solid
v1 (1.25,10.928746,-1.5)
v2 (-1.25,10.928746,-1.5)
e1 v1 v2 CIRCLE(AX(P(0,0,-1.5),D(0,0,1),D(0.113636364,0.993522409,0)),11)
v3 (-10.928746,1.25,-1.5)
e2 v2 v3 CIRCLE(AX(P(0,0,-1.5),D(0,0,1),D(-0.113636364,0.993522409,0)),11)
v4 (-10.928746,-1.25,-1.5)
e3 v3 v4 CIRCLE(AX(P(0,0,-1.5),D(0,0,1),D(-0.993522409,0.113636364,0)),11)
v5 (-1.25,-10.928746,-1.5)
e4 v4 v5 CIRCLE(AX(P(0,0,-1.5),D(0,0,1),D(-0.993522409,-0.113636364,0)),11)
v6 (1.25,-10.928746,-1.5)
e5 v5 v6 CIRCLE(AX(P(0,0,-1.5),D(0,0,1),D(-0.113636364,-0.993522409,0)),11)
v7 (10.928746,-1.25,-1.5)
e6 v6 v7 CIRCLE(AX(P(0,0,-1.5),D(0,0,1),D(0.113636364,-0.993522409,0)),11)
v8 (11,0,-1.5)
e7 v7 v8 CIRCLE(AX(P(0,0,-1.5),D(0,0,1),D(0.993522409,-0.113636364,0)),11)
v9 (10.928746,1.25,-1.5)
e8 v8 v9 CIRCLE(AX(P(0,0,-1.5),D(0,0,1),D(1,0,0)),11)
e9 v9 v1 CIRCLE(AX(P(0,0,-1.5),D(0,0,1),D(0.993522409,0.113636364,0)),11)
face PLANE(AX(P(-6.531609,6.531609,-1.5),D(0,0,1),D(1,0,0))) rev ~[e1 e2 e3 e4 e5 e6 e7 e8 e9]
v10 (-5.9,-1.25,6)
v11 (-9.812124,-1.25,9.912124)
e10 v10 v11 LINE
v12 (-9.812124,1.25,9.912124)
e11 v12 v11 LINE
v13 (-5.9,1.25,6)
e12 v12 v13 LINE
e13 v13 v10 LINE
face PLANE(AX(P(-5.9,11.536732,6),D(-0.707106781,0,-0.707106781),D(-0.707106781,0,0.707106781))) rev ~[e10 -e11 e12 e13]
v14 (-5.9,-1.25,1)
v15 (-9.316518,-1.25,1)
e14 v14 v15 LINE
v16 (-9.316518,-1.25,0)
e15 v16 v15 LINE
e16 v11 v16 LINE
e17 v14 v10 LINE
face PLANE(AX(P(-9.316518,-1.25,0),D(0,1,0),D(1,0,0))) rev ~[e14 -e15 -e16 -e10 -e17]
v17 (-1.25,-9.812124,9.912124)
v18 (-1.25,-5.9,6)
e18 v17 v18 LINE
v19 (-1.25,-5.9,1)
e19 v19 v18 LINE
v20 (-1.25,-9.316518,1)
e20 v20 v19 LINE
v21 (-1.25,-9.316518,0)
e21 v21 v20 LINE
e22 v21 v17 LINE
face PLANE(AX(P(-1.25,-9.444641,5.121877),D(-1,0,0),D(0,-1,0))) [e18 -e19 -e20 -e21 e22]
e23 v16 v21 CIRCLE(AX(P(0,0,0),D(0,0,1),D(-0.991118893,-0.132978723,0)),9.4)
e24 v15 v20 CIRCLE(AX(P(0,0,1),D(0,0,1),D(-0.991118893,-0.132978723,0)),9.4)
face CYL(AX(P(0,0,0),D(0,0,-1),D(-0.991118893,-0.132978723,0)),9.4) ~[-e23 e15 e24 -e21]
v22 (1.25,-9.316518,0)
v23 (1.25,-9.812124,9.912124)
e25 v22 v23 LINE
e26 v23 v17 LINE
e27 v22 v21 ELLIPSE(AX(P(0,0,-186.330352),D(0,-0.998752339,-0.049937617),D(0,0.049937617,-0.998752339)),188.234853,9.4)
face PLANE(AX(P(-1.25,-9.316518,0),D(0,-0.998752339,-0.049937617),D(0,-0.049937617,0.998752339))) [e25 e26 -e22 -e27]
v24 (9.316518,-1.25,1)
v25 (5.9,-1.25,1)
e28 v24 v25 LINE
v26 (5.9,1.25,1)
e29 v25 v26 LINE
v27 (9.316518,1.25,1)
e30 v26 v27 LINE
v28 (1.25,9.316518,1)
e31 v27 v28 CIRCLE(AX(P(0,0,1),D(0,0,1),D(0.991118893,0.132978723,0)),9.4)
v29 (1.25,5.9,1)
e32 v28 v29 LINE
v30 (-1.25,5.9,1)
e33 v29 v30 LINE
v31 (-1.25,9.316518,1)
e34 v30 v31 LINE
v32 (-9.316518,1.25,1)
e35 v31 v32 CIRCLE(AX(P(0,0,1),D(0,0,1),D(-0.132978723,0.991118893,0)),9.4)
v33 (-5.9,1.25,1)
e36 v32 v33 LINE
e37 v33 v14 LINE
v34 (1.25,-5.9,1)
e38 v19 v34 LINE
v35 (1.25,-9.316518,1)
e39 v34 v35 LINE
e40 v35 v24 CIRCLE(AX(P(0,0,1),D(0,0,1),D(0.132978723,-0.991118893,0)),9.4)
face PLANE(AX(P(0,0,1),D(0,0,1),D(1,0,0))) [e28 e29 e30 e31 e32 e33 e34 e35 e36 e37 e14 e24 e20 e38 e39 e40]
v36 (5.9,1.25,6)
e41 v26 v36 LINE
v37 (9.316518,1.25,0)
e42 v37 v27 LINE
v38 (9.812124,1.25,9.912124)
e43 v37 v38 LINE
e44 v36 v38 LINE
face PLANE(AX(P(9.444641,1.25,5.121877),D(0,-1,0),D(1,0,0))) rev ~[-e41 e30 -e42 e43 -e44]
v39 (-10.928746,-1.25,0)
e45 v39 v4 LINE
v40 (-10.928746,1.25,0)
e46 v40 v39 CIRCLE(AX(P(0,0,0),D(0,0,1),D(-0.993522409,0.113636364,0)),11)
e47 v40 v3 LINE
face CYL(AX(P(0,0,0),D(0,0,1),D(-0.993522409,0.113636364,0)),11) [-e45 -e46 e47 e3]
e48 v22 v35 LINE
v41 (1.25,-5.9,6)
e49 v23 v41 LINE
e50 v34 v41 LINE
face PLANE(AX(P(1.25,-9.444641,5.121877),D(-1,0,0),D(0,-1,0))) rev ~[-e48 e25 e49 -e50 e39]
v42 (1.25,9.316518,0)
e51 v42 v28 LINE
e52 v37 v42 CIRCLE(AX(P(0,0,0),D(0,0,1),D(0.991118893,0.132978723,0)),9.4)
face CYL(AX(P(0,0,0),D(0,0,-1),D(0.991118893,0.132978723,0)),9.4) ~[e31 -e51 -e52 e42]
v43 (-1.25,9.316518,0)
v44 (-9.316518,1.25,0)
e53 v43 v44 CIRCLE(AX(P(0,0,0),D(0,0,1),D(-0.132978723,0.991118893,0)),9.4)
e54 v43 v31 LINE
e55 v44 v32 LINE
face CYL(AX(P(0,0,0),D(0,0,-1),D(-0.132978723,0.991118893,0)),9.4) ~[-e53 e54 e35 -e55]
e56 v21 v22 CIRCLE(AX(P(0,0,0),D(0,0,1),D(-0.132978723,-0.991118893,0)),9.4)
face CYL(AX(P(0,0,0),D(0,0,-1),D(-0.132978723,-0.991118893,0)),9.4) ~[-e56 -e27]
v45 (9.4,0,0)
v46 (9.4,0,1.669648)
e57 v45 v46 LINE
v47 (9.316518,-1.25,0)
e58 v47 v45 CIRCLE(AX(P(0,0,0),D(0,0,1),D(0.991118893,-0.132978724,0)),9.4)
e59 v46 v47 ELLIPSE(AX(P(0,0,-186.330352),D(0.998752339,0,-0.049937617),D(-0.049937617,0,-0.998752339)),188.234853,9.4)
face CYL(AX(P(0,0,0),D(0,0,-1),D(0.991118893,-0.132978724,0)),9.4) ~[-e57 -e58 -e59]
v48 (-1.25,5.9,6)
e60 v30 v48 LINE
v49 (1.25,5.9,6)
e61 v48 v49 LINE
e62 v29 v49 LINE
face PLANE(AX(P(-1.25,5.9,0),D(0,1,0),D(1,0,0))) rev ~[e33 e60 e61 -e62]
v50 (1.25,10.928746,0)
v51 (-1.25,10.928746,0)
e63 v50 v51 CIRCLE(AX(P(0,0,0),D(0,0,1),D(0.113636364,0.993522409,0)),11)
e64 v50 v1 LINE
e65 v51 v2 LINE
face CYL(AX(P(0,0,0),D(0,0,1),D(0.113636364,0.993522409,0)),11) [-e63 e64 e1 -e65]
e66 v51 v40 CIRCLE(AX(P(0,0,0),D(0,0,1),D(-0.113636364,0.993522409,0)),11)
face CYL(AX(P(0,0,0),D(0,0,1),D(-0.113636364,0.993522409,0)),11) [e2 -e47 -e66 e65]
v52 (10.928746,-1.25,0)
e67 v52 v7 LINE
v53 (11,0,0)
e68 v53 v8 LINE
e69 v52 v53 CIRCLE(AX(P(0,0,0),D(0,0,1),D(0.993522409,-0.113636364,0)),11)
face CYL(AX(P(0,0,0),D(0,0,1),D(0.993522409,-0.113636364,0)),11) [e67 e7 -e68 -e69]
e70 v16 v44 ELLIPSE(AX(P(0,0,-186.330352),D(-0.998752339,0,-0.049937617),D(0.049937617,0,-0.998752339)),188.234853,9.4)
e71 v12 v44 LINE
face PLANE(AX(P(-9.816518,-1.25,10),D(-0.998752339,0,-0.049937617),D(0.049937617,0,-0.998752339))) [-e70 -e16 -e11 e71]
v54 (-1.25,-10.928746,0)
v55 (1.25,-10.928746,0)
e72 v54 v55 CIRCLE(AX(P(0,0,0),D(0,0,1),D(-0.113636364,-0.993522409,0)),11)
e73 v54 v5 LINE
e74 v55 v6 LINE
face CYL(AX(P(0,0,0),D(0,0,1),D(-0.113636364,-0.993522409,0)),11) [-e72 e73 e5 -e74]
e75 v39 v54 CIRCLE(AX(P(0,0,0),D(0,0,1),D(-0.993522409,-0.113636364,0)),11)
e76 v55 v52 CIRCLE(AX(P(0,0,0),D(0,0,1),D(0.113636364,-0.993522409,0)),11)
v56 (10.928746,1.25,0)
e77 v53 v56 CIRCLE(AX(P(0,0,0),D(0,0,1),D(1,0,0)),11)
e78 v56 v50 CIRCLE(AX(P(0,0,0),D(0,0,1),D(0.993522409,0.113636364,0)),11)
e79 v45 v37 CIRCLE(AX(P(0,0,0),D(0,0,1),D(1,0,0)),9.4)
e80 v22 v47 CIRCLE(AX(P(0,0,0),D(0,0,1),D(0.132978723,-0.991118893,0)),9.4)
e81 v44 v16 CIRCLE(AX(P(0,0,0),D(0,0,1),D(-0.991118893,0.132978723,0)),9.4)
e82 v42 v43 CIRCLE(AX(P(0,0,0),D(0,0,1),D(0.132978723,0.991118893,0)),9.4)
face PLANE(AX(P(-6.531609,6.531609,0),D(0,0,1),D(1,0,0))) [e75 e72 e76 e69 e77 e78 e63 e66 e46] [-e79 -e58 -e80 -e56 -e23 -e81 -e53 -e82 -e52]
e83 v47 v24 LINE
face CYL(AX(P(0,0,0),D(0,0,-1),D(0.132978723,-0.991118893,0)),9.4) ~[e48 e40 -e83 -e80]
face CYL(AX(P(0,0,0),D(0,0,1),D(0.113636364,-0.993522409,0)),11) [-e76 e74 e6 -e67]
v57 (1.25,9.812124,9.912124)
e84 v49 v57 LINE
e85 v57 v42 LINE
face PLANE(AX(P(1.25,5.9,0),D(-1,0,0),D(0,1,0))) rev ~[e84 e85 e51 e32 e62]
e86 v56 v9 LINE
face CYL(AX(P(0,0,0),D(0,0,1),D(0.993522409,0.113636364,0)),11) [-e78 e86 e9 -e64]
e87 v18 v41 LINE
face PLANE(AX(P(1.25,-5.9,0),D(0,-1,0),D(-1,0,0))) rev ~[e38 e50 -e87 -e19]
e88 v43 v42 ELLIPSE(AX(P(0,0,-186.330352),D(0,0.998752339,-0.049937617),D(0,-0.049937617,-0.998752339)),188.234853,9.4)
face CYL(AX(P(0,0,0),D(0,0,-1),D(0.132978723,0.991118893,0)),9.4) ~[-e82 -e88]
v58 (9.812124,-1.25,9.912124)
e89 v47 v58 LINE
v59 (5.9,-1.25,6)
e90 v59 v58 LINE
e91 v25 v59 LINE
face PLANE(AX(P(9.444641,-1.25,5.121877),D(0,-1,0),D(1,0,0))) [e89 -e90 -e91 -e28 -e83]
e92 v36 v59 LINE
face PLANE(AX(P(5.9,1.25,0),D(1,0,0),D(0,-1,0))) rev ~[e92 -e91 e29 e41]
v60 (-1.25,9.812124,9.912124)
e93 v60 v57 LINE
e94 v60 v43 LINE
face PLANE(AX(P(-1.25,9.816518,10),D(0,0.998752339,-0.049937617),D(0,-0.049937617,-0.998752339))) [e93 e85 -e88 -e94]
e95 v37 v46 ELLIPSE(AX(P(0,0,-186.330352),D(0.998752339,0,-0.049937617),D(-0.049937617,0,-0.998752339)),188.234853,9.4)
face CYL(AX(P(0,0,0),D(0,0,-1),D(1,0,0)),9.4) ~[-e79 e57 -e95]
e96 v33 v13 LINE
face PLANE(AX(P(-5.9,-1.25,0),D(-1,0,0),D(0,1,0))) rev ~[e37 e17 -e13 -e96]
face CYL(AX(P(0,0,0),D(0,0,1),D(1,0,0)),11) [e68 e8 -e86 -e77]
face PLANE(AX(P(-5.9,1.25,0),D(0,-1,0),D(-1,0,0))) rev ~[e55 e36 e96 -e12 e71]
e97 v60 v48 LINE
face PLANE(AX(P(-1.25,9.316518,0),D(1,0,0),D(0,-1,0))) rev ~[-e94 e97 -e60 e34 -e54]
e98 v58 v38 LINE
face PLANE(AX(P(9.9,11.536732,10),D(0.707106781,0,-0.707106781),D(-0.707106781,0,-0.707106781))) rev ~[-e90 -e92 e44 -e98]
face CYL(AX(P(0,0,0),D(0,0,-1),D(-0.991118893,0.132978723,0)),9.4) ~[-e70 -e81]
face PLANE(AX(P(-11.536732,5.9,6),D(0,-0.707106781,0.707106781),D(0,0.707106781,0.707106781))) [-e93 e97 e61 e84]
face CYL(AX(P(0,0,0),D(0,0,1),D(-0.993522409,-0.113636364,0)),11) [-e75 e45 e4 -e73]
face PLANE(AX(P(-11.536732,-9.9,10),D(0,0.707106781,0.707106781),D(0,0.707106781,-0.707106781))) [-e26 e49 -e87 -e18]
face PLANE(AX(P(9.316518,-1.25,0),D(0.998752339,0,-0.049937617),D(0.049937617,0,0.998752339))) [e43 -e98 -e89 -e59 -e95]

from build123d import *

# Parameters (mm, degrees)
F1_DEPTH     = 1.5
F2_DEPTH     = 10
F4_DEPTH     = 2.5
F6_DEPTH     = 2.5
F8_DEPTH     = 2.5
F10_DEPTH    = 2.5
F11_DEPTH    = 1
F12_T1_DEPTH = 23.0734639037
F12_T3_DEPTH = 23.0734639037


# Not quite as in the source:
# - a fillet or chamfer that OpenCascade refuses, or shapes differently, is made with other operations: its cross-section is extruded or revolved along the edge and cut away or added


with BuildPart() as f1:
    # F0 (on Top) → F1 (new body)
    with BuildSketch(Plane.XY):
        with BuildLine():
            Line((-1.25, 9.3165175897), (-1.25, 10.9287464972))
            ThreePointArc((-1.25, 10.9287464972), (-7.7781745931, 7.7781745931), (-10.9287464972, 1.25))
            Line((-10.9287464972, 1.25), (-9.3165175897, 1.25))
            ThreePointArc((-9.3165175897, 1.25), (-6.6468037432, 6.6468037432), (-1.25, 9.3165175897))
        make_face()
        with BuildLine():
            ThreePointArc((-10.9287464972, -1.25), (-7.7781745931, -7.7781745931), (-1.25, -10.9287464972))
            Line((-1.25, -10.9287464972), (-1.25, -9.3165175897))
            ThreePointArc((-1.25, -9.3165175897), (-6.6468037432, -6.6468037432), (-9.3165175897, -1.25))
            Line((-9.3165175897, -1.25), (-10.9287464972, -1.25))
        make_face()
        with BuildLine():
            Line((-9.3165175897, 1.25), (-10.9287464972, 1.25))
            ThreePointArc((-10.9287464972, 1.25), (-11, 0), (-10.9287464972, -1.25))
            Line((-10.9287464972, -1.25), (-9.3165175897, -1.25))
            ThreePointArc((-9.3165175897, -1.25), (-9.4, 0), (-9.3165175897, 1.25))
        make_face()
        with BuildLine():
            ThreePointArc((1.25, -10.9287464972), (7.7781745931, -7.7781745931), (10.9287464972, -1.25))
            Line((10.9287464972, -1.25), (9.3165175897, -1.25))
            ThreePointArc((9.3165175897, -1.25), (6.6468037432, -6.6468037432), (1.25, -9.3165175897))
            Line((1.25, -9.3165175897), (1.25, -10.9287464972))
        make_face()
        with BuildLine():
            ThreePointArc((-1.25, -10.9287464972), (0, -11), (1.25, -10.9287464972))
            Line((1.25, -10.9287464972), (1.25, -9.3165175897))
            ThreePointArc((1.25, -9.3165175897), (0, -9.4), (-1.25, -9.3165175897))
            Line((-1.25, -9.3165175897), (-1.25, -10.9287464972))
        make_face()
        with BuildLine():
            Line((9.3165175897, 1.25), (10.9287464972, 1.25))
            ThreePointArc((10.9287464972, 1.25), (7.7781745931, 7.7781745931), (1.25, 10.9287464972))
            Line((1.25, 10.9287464972), (1.25, 9.3165175897))
            ThreePointArc((1.25, 9.3165175897), (6.6468037432, 6.6468037432), (9.3165175897, 1.25))
        make_face()
        with BuildLine():
            ThreePointArc((10.9287464972, -1.25), (10.9821721774, -0.6260145888), (11, 0))
            ThreePointArc((11, 0), (10.9821721774, 0.6260145888), (10.9287464972, 1.25))
            Line((10.9287464972, 1.25), (9.3165175897, 1.25))
            ThreePointArc((9.3165175897, 1.25), (9.3791061766, 0.6263923117), (9.4, 0))
            ThreePointArc((9.4, 0), (9.3791061766, -0.6263923117), (9.3165175897, -1.25))
            Line((9.3165175897, -1.25), (10.9287464972, -1.25))
        make_face()
        with BuildLine():
            Line((1.25, 9.3165175897), (1.25, 10.9287464972))
            ThreePointArc((1.25, 10.9287464972), (0, 11), (-1.25, 10.9287464972))
            Line((-1.25, 10.9287464972), (-1.25, 9.3165175897))
            ThreePointArc((-1.25, 9.3165175897), (0, 9.4), (1.25, 9.3165175897))
        make_face()
        with BuildLine():
            Line((5.9, 1.25), (9.3165175897, 1.25))
            ThreePointArc((9.3165175897, 1.25), (6.6468037432, 6.6468037432), (1.25, 9.3165175897))
            Line((1.25, 9.3165175897), (1.25, 5.9))
            Line((1.25, 5.9), (-1.25, 5.9))
            Line((-1.25, 5.9), (-1.25, 9.3165175897))
            ThreePointArc((-1.25, 9.3165175897), (-6.6468037432, 6.6468037432), (-9.3165175897, 1.25))
            Line((-9.3165175897, 1.25), (-5.9, 1.25))
            Line((-5.9, 1.25), (-5.9, -1.25))
            Line((-5.9, -1.25), (-9.3165175897, -1.25))
            ThreePointArc((-9.3165175897, -1.25), (-6.6468037432, -6.6468037432), (-1.25, -9.3165175897))
            Line((-1.25, -9.3165175897), (-1.25, -5.9))
            Line((-1.25, -5.9), (1.25, -5.9))
            Line((1.25, -5.9), (1.25, -9.3165175897))
            ThreePointArc((1.25, -9.3165175897), (6.6468037432, -6.6468037432), (9.3165175897, -1.25))
            Line((9.3165175897, -1.25), (5.9, -1.25))
            Line((5.9, -1.25), (5.9, 1.25))
        make_face()
        with BuildLine():
            Line((1.25, 5.9), (1.25, 9.3165175897))
            ThreePointArc((1.25, 9.3165175897), (0, 9.4), (-1.25, 9.3165175897))
            Line((-1.25, 9.3165175897), (-1.25, 5.9))
            Line((-1.25, 5.9), (1.25, 5.9))
        make_face()
        with BuildLine():
            ThreePointArc((9.4, 0), (9.3791061766, 0.6263923117), (9.3165175897, 1.25))
            Line((9.3165175897, 1.25), (5.9, 1.25))
            Line((5.9, 1.25), (5.9, -1.25))
            Line((5.9, -1.25), (9.3165175897, -1.25))
            ThreePointArc((9.3165175897, -1.25), (9.3791061766, -0.6263923117), (9.4, 0))
        make_face()
        with BuildLine():
            Line((-5.9, 1.25), (-9.3165175897, 1.25))
            ThreePointArc((-9.3165175897, 1.25), (-9.4, 0), (-9.3165175897, -1.25))
            Line((-9.3165175897, -1.25), (-5.9, -1.25))
            Line((-5.9, -1.25), (-5.9, 1.25))
        make_face()
        with BuildLine():
            ThreePointArc((-1.25, -9.3165175897), (0, -9.4), (1.25, -9.3165175897))
            Line((1.25, -9.3165175897), (1.25, -5.9))
            Line((1.25, -5.9), (-1.25, -5.9))
            Line((-1.25, -5.9), (-1.25, -9.3165175897))
        make_face()
    extrude(amount=-F1_DEPTH)

    # F0 (on Top) → F2 (join)
    with BuildSketch(Plane.XY):
        with BuildLine():
            Line((1.25, 5.9), (1.25, 9.3165175897))
            ThreePointArc((1.25, 9.3165175897), (0, 9.4), (-1.25, 9.3165175897))
            Line((-1.25, 9.3165175897), (-1.25, 5.9))
            Line((-1.25, 5.9), (1.25, 5.9))
        make_face()
        with BuildLine():
            ThreePointArc((9.4, 0), (9.3791061766, 0.6263923117), (9.3165175897, 1.25))
            Line((9.3165175897, 1.25), (5.9, 1.25))
            Line((5.9, 1.25), (5.9, -1.25))
            Line((5.9, -1.25), (9.3165175897, -1.25))
            ThreePointArc((9.3165175897, -1.25), (9.3791061766, -0.6263923117), (9.4, 0))
        make_face()
        with BuildLine():
            Line((-5.9, 1.25), (-9.3165175897, 1.25))
            ThreePointArc((-9.3165175897, 1.25), (-9.4, 0), (-9.3165175897, -1.25))
            Line((-9.3165175897, -1.25), (-5.9, -1.25))
            Line((-5.9, -1.25), (-5.9, 1.25))
        make_face()
        with BuildLine():
            ThreePointArc((-1.25, -9.3165175897), (0, -9.4), (1.25, -9.3165175897))
            Line((1.25, -9.3165175897), (1.25, -5.9))
            Line((1.25, -5.9), (-1.25, -5.9))
            Line((-1.25, -5.9), (-1.25, -9.3165175897))
        make_face()
    extrude(amount=F2_DEPTH)

    # F3 (on face) → F4 (join)
    with BuildSketch(Plane(origin=(-1.25, 0, 0), x_dir=(0, -1, 0), z_dir=(-1, 0, 0))):
        Polygon((-9.3165175897, 0), (-9.3165175897, 10), (-9.8165175897, 10), align=None)
    extrude(amount=-F4_DEPTH)

    # F5 (on face) → F6 (join)
    with BuildSketch(Plane(origin=(-1.25, 0, 0), x_dir=(0, -1, 0), z_dir=(-1, 0, 0))):
        Polygon((9.8165175897, 10), (9.3165175897, 10), (9.3165175897, 0), align=None)
    extrude(amount=-F6_DEPTH)

    # F7 (on face) → F8 (join)
    with BuildSketch(Plane.XZ.offset(1.25)):
        Polygon((-9.3165175897, 0), (-9.3165175897, 10), (-9.8165175897, 10), align=None)
    extrude(amount=-F8_DEPTH)

    # F9 (on face) → F10 (join)
    with BuildSketch(Plane.XZ.offset(1.25)):
        Polygon((9.8165175897, 10), (9.3165175897, 10), (9.3165175897, 0), align=None)
    extrude(amount=-F10_DEPTH)

    # F0 (on Top) → F11 (join)
    with BuildSketch(Plane.XY):
        with BuildLine():
            Line((5.9, 1.25), (9.3165175897, 1.25))
            ThreePointArc((9.3165175897, 1.25), (6.6468037432, 6.6468037432), (1.25, 9.3165175897))
            Line((1.25, 9.3165175897), (1.25, 5.9))
            Line((1.25, 5.9), (-1.25, 5.9))
            Line((-1.25, 5.9), (-1.25, 9.3165175897))
            ThreePointArc((-1.25, 9.3165175897), (-6.6468037432, 6.6468037432), (-9.3165175897, 1.25))
            Line((-9.3165175897, 1.25), (-5.9, 1.25))
            Line((-5.9, 1.25), (-5.9, -1.25))
            Line((-5.9, -1.25), (-9.3165175897, -1.25))
            ThreePointArc((-9.3165175897, -1.25), (-6.6468037432, -6.6468037432), (-1.25, -9.3165175897))
            Line((-1.25, -9.3165175897), (-1.25, -5.9))
            Line((-1.25, -5.9), (1.25, -5.9))
            Line((1.25, -5.9), (1.25, -9.3165175897))
            ThreePointArc((1.25, -9.3165175897), (6.6468037432, -6.6468037432), (9.3165175897, -1.25))
            Line((9.3165175897, -1.25), (5.9, -1.25))
            Line((5.9, -1.25), (5.9, 1.25))
        make_face()
    extrude(amount=F11_DEPTH)

    # F12: chamfer of 4 on 4 edges, made by hand

    # F12_s2 → F12_t1 (cut)
    with BuildSketch(Plane.YZ.offset(-11.5367319519)):
        Polygon((5.9, 6), (9.9, 10), (5.9, 10), align=None)
        Polygon((-9.9, 10), (-5.9, 6), (-5.9, 10), align=None)
    extrude(amount=F12_T1_DEPTH, mode=Mode.SUBTRACT)

    # F12_s4 → F12_t3 (cut)
    with BuildSketch(Plane.XZ.offset(-11.5367319519)):
        Polygon((9.9, 10), (5.9, 6), (5.9, 10), align=None)
        Polygon((-5.9, 6), (-9.9, 10), (-5.9, 10), align=None)
    extrude(amount=F12_T3_DEPTH, mode=Mode.SUBTRACT)


solid = f1.part
